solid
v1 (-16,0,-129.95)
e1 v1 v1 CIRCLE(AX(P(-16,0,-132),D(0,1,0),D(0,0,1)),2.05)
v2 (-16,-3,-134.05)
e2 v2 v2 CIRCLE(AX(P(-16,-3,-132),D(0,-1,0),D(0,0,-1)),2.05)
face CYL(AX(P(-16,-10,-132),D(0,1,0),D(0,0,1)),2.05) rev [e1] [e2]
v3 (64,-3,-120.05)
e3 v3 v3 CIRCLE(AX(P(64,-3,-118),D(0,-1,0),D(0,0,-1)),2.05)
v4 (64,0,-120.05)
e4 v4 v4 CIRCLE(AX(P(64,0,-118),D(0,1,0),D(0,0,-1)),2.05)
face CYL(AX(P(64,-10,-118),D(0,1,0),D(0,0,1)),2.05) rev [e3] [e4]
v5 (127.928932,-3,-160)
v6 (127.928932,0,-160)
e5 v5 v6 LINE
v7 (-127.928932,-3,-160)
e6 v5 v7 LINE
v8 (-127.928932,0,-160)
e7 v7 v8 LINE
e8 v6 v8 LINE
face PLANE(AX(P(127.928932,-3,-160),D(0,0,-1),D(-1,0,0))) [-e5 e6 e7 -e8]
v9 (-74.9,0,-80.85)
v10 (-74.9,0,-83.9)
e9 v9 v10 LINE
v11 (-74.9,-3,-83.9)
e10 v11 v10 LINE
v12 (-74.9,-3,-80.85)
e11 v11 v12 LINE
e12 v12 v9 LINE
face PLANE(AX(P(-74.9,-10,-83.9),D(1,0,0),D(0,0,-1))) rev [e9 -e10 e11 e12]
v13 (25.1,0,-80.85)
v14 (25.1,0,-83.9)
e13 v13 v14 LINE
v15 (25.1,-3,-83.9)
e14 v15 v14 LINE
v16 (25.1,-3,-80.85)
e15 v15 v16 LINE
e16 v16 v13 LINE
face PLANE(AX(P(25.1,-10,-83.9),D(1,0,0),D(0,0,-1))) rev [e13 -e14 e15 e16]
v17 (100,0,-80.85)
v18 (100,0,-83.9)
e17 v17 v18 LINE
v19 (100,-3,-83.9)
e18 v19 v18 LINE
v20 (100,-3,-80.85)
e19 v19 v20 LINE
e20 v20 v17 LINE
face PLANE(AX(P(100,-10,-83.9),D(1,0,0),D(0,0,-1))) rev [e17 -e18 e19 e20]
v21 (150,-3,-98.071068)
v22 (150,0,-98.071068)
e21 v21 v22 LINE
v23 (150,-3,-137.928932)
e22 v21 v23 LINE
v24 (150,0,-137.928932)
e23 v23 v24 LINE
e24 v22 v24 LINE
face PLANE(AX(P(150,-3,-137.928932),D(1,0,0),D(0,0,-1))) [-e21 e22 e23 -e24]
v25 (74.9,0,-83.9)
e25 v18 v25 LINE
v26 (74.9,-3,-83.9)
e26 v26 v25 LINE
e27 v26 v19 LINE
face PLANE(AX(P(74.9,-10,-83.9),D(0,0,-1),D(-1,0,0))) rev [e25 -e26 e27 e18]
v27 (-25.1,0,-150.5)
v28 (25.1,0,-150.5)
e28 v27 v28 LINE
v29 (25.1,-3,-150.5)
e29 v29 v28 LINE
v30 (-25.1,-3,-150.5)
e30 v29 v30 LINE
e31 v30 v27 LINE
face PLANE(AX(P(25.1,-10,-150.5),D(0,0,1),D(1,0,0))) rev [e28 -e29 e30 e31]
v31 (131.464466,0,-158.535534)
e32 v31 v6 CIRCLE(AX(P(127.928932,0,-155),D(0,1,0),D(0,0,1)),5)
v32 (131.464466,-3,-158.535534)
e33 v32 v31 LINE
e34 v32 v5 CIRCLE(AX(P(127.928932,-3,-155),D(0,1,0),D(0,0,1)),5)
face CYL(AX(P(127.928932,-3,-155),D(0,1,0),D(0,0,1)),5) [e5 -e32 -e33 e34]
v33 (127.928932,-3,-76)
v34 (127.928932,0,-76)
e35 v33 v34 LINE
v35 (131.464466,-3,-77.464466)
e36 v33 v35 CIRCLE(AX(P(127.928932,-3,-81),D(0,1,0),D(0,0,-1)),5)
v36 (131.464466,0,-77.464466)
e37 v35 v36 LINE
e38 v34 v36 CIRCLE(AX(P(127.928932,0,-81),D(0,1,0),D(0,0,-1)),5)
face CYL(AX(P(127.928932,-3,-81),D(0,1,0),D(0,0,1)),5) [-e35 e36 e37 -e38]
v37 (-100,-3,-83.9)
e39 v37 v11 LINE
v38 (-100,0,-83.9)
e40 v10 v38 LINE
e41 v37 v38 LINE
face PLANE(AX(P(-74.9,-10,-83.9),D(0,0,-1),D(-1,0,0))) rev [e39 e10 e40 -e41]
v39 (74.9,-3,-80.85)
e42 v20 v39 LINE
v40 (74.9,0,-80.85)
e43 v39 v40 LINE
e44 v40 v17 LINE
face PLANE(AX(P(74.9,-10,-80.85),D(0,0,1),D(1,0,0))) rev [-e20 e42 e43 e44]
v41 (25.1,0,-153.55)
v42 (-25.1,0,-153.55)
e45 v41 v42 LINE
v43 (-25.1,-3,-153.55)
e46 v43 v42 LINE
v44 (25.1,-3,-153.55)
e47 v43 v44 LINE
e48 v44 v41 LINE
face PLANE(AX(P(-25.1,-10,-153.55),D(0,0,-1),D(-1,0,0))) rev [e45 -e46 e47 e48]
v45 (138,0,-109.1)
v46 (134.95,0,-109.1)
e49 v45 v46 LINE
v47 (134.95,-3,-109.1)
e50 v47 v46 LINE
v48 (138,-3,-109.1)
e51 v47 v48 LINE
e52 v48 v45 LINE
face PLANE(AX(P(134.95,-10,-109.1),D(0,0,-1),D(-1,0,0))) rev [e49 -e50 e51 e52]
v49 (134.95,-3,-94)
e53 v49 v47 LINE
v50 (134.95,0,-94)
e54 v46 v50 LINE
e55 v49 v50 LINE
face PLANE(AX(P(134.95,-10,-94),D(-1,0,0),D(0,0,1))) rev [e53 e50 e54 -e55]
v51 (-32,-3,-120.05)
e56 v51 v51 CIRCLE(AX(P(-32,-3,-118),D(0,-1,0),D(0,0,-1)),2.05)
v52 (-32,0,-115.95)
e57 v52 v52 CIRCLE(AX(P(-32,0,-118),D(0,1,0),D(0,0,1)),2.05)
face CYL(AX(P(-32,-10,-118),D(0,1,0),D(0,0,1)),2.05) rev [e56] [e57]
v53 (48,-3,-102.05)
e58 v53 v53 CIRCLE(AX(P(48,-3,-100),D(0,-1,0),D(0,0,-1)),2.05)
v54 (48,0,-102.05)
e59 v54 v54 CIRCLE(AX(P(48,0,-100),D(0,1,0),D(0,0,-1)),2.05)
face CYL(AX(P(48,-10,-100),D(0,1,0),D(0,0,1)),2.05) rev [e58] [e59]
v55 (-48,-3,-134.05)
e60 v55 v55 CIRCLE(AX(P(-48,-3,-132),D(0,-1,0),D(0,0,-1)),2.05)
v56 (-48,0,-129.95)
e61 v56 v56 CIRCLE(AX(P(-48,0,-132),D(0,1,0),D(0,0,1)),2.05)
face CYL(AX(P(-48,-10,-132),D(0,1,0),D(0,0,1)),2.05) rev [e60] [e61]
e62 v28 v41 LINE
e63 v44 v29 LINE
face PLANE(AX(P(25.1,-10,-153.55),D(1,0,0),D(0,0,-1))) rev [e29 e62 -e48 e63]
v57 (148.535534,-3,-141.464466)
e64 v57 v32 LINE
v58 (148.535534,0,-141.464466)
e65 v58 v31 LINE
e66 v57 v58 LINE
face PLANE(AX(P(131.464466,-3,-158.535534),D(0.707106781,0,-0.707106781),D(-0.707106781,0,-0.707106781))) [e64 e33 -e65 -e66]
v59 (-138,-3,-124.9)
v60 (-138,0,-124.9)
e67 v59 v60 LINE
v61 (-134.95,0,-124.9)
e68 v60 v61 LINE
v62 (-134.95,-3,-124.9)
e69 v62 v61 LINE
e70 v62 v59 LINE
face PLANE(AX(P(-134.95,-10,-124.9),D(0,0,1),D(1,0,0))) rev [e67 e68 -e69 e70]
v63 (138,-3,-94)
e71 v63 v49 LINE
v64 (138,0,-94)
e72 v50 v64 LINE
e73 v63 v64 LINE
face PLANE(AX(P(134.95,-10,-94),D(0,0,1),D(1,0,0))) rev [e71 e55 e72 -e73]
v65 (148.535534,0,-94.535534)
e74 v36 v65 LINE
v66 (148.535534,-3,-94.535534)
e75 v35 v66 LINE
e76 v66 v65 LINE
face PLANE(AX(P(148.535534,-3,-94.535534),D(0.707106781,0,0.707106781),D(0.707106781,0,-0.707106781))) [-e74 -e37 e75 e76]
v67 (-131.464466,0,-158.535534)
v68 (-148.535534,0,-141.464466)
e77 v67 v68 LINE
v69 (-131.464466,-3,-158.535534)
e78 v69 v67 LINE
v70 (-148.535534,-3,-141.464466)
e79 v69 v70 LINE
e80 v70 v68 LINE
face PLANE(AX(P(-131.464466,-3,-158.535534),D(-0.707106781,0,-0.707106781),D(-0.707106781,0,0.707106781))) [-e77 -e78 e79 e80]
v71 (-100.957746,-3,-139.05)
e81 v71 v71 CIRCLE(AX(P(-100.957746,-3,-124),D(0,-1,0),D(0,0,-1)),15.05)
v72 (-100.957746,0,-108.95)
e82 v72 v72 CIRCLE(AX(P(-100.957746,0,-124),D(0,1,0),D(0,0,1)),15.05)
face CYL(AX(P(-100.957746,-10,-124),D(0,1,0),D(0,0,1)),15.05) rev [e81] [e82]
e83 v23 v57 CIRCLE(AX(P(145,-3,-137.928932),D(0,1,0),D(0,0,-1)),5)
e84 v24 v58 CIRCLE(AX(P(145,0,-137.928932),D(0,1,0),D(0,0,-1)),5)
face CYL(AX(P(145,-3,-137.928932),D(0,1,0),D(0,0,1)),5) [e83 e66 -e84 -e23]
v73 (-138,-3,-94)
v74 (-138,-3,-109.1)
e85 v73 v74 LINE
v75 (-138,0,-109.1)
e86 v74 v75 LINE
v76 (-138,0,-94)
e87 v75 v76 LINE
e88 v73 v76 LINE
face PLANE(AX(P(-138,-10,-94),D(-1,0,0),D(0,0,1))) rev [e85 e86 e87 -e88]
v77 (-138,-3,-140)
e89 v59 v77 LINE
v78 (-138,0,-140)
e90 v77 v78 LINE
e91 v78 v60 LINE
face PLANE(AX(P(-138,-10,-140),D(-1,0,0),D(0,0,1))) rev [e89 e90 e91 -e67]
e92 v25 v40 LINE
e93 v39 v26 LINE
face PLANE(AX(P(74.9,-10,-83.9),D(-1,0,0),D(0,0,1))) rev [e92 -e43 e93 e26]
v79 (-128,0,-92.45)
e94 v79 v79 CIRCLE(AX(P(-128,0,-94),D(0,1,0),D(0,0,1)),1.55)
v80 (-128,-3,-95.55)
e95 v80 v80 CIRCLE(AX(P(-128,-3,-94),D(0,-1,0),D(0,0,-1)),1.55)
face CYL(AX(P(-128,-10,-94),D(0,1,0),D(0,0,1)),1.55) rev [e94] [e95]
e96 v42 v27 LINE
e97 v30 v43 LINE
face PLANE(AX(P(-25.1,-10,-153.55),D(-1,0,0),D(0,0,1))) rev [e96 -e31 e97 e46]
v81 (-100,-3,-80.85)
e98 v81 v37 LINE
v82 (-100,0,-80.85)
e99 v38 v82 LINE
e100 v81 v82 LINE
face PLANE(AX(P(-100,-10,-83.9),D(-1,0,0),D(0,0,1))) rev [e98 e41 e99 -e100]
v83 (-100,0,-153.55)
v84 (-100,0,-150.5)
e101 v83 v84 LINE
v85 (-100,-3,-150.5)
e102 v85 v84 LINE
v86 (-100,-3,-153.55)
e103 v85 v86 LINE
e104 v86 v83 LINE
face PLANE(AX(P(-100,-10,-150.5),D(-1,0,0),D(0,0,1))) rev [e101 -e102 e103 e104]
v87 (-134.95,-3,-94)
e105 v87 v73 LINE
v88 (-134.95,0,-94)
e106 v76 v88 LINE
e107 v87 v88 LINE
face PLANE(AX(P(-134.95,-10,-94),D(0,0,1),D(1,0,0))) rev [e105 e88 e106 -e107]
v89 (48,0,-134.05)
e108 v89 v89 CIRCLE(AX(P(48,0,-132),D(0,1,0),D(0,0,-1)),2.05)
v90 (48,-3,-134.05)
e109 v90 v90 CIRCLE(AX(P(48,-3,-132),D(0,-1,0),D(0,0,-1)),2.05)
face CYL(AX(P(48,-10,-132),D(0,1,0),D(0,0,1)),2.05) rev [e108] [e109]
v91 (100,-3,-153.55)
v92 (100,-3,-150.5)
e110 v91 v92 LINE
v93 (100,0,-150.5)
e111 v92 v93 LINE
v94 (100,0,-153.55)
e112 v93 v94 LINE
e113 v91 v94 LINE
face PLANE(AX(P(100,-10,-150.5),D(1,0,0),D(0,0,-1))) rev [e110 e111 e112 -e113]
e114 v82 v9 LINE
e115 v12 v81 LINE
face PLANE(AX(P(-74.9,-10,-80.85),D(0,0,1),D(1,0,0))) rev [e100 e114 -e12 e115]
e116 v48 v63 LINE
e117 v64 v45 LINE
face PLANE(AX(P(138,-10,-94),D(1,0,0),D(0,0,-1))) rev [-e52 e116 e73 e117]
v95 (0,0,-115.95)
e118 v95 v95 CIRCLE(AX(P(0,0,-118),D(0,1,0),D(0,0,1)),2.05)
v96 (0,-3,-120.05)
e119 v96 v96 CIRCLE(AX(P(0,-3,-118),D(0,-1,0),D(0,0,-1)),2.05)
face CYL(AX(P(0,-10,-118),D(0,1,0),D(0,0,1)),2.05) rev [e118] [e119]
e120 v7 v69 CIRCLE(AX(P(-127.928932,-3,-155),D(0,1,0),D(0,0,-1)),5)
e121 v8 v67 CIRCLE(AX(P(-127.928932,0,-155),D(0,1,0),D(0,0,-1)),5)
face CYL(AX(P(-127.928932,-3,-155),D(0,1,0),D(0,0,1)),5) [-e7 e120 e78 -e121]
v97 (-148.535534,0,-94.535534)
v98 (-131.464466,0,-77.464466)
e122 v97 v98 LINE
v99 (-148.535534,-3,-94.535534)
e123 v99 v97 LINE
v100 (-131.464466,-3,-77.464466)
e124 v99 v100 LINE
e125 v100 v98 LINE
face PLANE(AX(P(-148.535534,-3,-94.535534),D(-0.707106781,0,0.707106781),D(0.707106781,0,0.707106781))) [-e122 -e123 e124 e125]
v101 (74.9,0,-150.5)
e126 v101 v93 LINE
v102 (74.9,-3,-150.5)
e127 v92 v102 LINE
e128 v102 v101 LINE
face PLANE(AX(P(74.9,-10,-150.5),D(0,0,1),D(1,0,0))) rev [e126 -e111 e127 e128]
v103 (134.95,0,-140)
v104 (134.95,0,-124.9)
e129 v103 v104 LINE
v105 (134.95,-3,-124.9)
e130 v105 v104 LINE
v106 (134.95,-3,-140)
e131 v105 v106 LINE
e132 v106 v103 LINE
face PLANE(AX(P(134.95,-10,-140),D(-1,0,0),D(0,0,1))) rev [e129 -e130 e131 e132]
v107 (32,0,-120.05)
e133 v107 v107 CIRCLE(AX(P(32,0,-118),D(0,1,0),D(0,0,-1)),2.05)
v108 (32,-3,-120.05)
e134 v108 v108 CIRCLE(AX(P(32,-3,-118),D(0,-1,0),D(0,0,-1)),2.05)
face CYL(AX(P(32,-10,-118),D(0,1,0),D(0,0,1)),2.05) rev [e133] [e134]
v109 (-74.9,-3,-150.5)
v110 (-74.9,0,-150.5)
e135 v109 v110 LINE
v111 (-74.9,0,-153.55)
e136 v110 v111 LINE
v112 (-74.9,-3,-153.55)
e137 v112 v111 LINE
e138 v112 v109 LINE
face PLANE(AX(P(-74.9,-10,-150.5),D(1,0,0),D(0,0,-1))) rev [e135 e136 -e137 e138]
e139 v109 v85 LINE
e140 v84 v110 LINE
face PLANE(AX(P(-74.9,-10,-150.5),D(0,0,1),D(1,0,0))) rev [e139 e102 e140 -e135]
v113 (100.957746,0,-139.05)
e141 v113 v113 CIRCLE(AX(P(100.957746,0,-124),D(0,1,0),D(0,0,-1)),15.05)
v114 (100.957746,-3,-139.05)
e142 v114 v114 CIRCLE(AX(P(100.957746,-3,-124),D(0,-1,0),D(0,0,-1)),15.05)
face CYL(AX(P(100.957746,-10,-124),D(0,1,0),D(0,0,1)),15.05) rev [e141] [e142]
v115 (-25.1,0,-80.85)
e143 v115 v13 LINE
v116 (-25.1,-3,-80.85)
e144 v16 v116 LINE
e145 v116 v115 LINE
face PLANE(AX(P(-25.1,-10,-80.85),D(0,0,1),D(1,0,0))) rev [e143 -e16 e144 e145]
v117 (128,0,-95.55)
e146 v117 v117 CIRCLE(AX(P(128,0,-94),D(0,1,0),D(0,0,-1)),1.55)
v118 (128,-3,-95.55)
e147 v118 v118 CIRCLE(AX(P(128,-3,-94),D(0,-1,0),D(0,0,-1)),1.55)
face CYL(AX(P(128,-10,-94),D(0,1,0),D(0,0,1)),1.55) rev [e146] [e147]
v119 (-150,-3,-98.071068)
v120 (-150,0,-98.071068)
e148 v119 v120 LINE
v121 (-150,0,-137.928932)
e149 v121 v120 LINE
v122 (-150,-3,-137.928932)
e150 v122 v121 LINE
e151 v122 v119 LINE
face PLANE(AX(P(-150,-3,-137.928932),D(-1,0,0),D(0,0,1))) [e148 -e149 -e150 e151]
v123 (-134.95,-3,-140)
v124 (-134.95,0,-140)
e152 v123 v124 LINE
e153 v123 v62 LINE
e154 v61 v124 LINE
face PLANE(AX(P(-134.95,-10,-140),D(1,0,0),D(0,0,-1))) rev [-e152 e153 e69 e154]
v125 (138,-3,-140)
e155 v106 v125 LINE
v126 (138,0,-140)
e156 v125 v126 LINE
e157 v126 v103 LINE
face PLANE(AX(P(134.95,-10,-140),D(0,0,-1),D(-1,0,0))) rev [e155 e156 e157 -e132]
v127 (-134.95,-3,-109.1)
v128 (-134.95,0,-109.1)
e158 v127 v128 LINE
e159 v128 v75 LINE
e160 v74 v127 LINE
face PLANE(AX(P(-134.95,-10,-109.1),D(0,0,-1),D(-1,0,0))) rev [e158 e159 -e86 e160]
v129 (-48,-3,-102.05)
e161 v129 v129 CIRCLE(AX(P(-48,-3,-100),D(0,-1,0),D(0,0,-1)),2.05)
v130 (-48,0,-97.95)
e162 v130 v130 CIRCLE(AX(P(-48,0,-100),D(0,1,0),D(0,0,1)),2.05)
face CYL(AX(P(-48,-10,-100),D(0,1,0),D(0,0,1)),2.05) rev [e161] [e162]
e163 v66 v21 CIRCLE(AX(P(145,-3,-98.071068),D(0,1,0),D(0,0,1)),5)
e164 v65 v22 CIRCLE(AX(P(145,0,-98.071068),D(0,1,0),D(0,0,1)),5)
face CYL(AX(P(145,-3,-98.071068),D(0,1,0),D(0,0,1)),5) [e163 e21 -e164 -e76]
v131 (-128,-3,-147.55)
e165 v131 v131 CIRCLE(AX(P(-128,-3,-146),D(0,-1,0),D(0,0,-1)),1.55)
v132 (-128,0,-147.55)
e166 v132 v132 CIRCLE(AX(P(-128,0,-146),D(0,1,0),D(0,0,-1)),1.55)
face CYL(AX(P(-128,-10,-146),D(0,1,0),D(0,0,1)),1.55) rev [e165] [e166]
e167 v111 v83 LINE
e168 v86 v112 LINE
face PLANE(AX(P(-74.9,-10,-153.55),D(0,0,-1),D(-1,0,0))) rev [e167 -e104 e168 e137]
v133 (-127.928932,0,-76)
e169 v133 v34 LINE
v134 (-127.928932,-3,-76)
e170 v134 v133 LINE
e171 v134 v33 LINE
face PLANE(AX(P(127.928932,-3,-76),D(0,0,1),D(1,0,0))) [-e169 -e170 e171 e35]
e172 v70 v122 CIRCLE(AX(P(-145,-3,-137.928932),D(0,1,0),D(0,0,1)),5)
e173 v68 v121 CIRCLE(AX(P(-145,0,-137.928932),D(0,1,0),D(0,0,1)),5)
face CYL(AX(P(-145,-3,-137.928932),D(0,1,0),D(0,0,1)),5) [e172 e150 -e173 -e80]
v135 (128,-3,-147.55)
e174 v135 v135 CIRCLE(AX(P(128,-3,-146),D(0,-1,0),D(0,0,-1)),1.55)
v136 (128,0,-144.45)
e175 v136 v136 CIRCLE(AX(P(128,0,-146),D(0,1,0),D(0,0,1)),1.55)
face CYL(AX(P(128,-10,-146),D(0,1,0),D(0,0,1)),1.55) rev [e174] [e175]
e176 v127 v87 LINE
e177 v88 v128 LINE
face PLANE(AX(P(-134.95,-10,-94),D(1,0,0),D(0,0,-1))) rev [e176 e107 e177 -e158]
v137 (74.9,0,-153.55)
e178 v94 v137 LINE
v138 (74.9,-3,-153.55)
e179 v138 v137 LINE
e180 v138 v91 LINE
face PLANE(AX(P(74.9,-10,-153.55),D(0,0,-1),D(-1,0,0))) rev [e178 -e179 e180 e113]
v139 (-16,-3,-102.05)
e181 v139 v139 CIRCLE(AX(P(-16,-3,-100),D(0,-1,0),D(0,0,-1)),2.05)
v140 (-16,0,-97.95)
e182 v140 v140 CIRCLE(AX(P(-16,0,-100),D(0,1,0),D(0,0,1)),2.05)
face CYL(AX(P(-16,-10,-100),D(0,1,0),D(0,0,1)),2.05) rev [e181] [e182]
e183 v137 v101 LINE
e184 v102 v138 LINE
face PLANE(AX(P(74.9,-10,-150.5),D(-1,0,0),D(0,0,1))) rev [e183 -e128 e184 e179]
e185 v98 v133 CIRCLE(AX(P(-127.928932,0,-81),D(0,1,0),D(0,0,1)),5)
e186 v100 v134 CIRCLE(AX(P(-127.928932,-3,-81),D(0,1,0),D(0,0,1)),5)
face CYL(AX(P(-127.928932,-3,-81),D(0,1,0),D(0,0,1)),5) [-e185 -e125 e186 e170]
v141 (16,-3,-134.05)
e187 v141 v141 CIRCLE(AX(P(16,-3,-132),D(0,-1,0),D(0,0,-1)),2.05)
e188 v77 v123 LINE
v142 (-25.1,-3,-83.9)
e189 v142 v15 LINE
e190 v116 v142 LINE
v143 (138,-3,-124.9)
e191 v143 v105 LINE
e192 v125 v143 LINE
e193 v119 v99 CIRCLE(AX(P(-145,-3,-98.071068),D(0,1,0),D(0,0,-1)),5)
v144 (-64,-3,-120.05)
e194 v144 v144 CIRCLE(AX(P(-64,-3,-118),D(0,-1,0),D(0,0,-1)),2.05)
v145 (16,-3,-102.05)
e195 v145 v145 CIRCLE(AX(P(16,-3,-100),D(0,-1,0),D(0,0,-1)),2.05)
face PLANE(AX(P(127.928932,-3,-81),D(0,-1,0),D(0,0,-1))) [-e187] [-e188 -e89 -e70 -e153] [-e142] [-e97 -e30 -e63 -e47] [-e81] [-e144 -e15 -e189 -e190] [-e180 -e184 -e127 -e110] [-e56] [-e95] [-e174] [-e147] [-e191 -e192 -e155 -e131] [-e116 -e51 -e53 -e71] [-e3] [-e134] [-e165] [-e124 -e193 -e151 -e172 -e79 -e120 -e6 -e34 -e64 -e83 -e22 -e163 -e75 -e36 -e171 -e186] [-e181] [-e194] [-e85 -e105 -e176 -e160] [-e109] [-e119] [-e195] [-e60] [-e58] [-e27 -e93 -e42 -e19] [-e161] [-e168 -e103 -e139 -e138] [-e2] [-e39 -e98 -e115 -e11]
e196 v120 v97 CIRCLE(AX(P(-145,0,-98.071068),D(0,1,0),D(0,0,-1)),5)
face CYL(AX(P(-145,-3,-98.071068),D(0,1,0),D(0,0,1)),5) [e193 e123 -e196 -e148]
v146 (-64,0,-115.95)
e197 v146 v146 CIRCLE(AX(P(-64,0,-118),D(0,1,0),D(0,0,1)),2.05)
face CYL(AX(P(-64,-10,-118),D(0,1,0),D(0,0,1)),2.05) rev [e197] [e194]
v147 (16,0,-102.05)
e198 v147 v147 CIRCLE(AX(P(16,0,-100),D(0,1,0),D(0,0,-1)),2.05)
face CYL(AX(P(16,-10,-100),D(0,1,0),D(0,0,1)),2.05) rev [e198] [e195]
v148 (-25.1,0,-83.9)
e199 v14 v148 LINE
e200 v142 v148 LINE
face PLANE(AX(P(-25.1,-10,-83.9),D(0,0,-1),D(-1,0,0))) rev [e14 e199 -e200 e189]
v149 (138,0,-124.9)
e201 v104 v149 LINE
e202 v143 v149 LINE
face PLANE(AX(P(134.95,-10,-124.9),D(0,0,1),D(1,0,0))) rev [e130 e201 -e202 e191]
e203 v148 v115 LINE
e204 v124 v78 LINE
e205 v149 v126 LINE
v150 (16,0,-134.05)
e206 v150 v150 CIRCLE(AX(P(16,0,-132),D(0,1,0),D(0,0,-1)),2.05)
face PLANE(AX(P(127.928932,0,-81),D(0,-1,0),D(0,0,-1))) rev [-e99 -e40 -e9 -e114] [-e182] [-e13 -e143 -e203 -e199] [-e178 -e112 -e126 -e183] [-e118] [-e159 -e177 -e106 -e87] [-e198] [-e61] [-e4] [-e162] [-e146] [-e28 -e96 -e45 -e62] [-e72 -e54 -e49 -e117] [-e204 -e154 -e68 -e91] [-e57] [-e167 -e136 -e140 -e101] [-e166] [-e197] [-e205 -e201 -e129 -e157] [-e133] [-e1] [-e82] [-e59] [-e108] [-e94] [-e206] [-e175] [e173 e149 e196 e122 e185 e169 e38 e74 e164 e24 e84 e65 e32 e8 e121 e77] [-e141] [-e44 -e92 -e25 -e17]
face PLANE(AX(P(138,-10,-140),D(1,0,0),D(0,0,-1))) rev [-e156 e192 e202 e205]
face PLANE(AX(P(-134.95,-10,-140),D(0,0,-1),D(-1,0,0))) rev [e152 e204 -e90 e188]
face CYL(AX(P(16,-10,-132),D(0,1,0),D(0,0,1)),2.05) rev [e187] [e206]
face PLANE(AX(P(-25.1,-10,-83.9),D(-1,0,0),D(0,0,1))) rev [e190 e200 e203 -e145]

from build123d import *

# Parameters (mm, degrees)
BASE_FLANGE1_START = -3
BASE_FLANGE1_DEPTH = 3
SKETCH6_R          = 1.55
CUT_EXTRUDE1_DEPTH = 10
SKETCH7_R          = 1.55
CUT_EXTRUDE2_DEPTH = 10
SKETCH8_W          = 50.2
SKETCH8_H          = 3.05
SKETCH8_W_2        = 25.1
SKETCH8_W_3        = 3.05
SKETCH8_H_2        = 15.1
CUT_EXTRUDE5_DEPTH = 10
SKETCH12_R         = 15.05
SKETCH12_R_2       = 2.05
CUT_EXTRUDE6_DEPTH = 10


# Read off the part's stored shape, not the designer's step: Base-Flange1
with BuildPart() as part:
    # Base-Flange1 outline → Base-Flange1 (new body)
    with BuildSketch(Plane(origin=(0, 0, 0), x_dir=(1, 0, 0), z_dir=(0, 1, 0)).offset(BASE_FLANGE1_START)):
        with BuildLine():
            Line((-127.928932188, 76), (127.928932188, 76))
            ThreePointArc((127.928932188, 76), (129.84234935, 76.380602337), (131.464466094, 77.464466094))
            Line((131.464466094, 77.464466094), (148.535533906, 94.535533906))
            ThreePointArc((148.535533906, 94.535533906), (149.619397663, 96.15765065), (150, 98.071067812))
            Line((150, 98.071067812), (150, 137.928932188))
            ThreePointArc((150, 137.928932188), (149.619397663, 139.84234935), (148.535533906, 141.464466094))
            Line((148.535533906, 141.464466094), (131.464466094, 158.535533906))
            ThreePointArc((131.464466094, 158.535533906), (129.84234935, 159.619397663), (127.928932188, 160))
            Line((127.928932188, 160), (-127.928932188, 160))
            ThreePointArc((-127.928932188, 160), (-129.84234935, 159.619397663), (-131.464466094, 158.535533906))
            Line((-131.464466094, 158.535533906), (-148.535533906, 141.464466094))
            ThreePointArc((-148.535533906, 141.464466094), (-149.619397663, 139.84234935), (-150, 137.928932188))
            Line((-150, 137.928932188), (-150, 98.071067812))
            ThreePointArc((-150, 98.071067812), (-149.619397663, 96.15765065), (-148.535533906, 94.535533906))
            Line((-148.535533906, 94.535533906), (-131.464466094, 77.464466094))
            ThreePointArc((-131.464466094, 77.464466094), (-129.84234935, 76.380602337), (-127.928932188, 76))
        make_face()
    extrude(amount=BASE_FLANGE1_DEPTH)

    # Sketch6 → Cut-Extrude1 (cut)
    with BuildSketch(Plane(origin=(0, 0, 0), x_dir=(1, 0, 0), z_dir=(0, 1, 0))):
        with Locations(Location((128, 146, 0), (0, 0, 270))):
            Circle(SKETCH6_R)
        with Locations(Location((-128, 146, 0), (0, 0, 90))):
            Circle(SKETCH6_R)
    extrude(amount=-CUT_EXTRUDE1_DEPTH, mode=Mode.SUBTRACT)

    # Sketch7 → Cut-Extrude2 (cut)
    with BuildSketch(Plane(origin=(0, 0, 0), x_dir=(1, 0, 0), z_dir=(0, 1, 0))):
        with Locations(Location((-128, 94, 0), (0, 0, 270))):
            Circle(SKETCH7_R)
        with Locations(Location((128, 94, 0), (0, 0, 90))):
            Circle(SKETCH7_R)
    extrude(amount=-CUT_EXTRUDE2_DEPTH, mode=Mode.SUBTRACT)

    # Sketch8 → Cut-Extrude5 (cut)
    with BuildSketch(Plane(origin=(0, 0, 0), x_dir=(1, 0, 0), z_dir=(0, 1, 0))):
        with Locations((0, 82.375)):
            Rectangle(SKETCH8_W, SKETCH8_H)
        with Locations((87.45, 82.375)):
            Rectangle(SKETCH8_W_2, SKETCH8_H)
        with Locations((136.475, 132.45)):
            Rectangle(SKETCH8_W_3, SKETCH8_H_2)
        with Locations((0, 152.025)):
            Rectangle(SKETCH8_W, SKETCH8_H)
        with Locations((87.45, 152.025)):
            Rectangle(SKETCH8_W_2, SKETCH8_H)
        with Locations((-87.45, 152.025)):
            Rectangle(SKETCH8_W_2, SKETCH8_H)
        with Locations((136.475, 101.55)):
            Rectangle(SKETCH8_W_3, SKETCH8_H_2)
        with Locations((-87.45, 82.375)):
            Rectangle(SKETCH8_W_2, SKETCH8_H)
        with Locations((-136.475, 101.55)):
            Rectangle(SKETCH8_W_3, SKETCH8_H_2)
        with Locations((-136.475, 132.45)):
            Rectangle(SKETCH8_W_3, SKETCH8_H_2)
    extrude(amount=-CUT_EXTRUDE5_DEPTH, mode=Mode.SUBTRACT)

    # Sketch12 → Cut-Extrude6 (cut)
    with BuildSketch(Plane(origin=(0, 0, 0), x_dir=(1, 0, 0), z_dir=(0, 1, 0))):
        with Locations(Location((-100.957746479, 124, 0), (0, 0, 270))):
            Circle(SKETCH12_R)
        with Locations(Location((100.957746479, 124, 0), (0, 0, 90))):
            Circle(SKETCH12_R)
        with Locations(Location((-48, 132, 0), (0, 0, 270))):
            Circle(SKETCH12_R_2)
        with Locations(Location((-48, 100, 0), (0, 0, 270))):
            Circle(SKETCH12_R_2)
        with Locations(Location((-16, 132, 0), (0, 0, 270))):
            Circle(SKETCH12_R_2)
        with Locations(Location((-16, 100, 0), (0, 0, 270))):
            Circle(SKETCH12_R_2)
        with Locations(Location((-32, 118, 0), (0, 0, 270))):
            Circle(SKETCH12_R_2)
        with Locations(Location((0, 118, 0), (0, 0, 270))):
            Circle(SKETCH12_R_2)
        with Locations(Location((-64, 118, 0), (0, 0, 270))):
            Circle(SKETCH12_R_2)
        with Locations(Location((64, 118, 0), (0, 0, 90))):
            Circle(SKETCH12_R_2)
        with Locations(Location((48, 132, 0), (0, 0, 90))):
            Circle(SKETCH12_R_2)
        with Locations(Location((48, 100, 0), (0, 0, 90))):
            Circle(SKETCH12_R_2)
        with Locations(Location((32, 118, 0), (0, 0, 90))):
            Circle(SKETCH12_R_2)
        with Locations(Location((16, 132, 0), (0, 0, 90))):
            Circle(SKETCH12_R_2)
        with Locations(Location((16, 100, 0), (0, 0, 90))):
            Circle(SKETCH12_R_2)
    extrude(amount=-CUT_EXTRUDE6_DEPTH, mode=Mode.SUBTRACT)


solid = part.part
